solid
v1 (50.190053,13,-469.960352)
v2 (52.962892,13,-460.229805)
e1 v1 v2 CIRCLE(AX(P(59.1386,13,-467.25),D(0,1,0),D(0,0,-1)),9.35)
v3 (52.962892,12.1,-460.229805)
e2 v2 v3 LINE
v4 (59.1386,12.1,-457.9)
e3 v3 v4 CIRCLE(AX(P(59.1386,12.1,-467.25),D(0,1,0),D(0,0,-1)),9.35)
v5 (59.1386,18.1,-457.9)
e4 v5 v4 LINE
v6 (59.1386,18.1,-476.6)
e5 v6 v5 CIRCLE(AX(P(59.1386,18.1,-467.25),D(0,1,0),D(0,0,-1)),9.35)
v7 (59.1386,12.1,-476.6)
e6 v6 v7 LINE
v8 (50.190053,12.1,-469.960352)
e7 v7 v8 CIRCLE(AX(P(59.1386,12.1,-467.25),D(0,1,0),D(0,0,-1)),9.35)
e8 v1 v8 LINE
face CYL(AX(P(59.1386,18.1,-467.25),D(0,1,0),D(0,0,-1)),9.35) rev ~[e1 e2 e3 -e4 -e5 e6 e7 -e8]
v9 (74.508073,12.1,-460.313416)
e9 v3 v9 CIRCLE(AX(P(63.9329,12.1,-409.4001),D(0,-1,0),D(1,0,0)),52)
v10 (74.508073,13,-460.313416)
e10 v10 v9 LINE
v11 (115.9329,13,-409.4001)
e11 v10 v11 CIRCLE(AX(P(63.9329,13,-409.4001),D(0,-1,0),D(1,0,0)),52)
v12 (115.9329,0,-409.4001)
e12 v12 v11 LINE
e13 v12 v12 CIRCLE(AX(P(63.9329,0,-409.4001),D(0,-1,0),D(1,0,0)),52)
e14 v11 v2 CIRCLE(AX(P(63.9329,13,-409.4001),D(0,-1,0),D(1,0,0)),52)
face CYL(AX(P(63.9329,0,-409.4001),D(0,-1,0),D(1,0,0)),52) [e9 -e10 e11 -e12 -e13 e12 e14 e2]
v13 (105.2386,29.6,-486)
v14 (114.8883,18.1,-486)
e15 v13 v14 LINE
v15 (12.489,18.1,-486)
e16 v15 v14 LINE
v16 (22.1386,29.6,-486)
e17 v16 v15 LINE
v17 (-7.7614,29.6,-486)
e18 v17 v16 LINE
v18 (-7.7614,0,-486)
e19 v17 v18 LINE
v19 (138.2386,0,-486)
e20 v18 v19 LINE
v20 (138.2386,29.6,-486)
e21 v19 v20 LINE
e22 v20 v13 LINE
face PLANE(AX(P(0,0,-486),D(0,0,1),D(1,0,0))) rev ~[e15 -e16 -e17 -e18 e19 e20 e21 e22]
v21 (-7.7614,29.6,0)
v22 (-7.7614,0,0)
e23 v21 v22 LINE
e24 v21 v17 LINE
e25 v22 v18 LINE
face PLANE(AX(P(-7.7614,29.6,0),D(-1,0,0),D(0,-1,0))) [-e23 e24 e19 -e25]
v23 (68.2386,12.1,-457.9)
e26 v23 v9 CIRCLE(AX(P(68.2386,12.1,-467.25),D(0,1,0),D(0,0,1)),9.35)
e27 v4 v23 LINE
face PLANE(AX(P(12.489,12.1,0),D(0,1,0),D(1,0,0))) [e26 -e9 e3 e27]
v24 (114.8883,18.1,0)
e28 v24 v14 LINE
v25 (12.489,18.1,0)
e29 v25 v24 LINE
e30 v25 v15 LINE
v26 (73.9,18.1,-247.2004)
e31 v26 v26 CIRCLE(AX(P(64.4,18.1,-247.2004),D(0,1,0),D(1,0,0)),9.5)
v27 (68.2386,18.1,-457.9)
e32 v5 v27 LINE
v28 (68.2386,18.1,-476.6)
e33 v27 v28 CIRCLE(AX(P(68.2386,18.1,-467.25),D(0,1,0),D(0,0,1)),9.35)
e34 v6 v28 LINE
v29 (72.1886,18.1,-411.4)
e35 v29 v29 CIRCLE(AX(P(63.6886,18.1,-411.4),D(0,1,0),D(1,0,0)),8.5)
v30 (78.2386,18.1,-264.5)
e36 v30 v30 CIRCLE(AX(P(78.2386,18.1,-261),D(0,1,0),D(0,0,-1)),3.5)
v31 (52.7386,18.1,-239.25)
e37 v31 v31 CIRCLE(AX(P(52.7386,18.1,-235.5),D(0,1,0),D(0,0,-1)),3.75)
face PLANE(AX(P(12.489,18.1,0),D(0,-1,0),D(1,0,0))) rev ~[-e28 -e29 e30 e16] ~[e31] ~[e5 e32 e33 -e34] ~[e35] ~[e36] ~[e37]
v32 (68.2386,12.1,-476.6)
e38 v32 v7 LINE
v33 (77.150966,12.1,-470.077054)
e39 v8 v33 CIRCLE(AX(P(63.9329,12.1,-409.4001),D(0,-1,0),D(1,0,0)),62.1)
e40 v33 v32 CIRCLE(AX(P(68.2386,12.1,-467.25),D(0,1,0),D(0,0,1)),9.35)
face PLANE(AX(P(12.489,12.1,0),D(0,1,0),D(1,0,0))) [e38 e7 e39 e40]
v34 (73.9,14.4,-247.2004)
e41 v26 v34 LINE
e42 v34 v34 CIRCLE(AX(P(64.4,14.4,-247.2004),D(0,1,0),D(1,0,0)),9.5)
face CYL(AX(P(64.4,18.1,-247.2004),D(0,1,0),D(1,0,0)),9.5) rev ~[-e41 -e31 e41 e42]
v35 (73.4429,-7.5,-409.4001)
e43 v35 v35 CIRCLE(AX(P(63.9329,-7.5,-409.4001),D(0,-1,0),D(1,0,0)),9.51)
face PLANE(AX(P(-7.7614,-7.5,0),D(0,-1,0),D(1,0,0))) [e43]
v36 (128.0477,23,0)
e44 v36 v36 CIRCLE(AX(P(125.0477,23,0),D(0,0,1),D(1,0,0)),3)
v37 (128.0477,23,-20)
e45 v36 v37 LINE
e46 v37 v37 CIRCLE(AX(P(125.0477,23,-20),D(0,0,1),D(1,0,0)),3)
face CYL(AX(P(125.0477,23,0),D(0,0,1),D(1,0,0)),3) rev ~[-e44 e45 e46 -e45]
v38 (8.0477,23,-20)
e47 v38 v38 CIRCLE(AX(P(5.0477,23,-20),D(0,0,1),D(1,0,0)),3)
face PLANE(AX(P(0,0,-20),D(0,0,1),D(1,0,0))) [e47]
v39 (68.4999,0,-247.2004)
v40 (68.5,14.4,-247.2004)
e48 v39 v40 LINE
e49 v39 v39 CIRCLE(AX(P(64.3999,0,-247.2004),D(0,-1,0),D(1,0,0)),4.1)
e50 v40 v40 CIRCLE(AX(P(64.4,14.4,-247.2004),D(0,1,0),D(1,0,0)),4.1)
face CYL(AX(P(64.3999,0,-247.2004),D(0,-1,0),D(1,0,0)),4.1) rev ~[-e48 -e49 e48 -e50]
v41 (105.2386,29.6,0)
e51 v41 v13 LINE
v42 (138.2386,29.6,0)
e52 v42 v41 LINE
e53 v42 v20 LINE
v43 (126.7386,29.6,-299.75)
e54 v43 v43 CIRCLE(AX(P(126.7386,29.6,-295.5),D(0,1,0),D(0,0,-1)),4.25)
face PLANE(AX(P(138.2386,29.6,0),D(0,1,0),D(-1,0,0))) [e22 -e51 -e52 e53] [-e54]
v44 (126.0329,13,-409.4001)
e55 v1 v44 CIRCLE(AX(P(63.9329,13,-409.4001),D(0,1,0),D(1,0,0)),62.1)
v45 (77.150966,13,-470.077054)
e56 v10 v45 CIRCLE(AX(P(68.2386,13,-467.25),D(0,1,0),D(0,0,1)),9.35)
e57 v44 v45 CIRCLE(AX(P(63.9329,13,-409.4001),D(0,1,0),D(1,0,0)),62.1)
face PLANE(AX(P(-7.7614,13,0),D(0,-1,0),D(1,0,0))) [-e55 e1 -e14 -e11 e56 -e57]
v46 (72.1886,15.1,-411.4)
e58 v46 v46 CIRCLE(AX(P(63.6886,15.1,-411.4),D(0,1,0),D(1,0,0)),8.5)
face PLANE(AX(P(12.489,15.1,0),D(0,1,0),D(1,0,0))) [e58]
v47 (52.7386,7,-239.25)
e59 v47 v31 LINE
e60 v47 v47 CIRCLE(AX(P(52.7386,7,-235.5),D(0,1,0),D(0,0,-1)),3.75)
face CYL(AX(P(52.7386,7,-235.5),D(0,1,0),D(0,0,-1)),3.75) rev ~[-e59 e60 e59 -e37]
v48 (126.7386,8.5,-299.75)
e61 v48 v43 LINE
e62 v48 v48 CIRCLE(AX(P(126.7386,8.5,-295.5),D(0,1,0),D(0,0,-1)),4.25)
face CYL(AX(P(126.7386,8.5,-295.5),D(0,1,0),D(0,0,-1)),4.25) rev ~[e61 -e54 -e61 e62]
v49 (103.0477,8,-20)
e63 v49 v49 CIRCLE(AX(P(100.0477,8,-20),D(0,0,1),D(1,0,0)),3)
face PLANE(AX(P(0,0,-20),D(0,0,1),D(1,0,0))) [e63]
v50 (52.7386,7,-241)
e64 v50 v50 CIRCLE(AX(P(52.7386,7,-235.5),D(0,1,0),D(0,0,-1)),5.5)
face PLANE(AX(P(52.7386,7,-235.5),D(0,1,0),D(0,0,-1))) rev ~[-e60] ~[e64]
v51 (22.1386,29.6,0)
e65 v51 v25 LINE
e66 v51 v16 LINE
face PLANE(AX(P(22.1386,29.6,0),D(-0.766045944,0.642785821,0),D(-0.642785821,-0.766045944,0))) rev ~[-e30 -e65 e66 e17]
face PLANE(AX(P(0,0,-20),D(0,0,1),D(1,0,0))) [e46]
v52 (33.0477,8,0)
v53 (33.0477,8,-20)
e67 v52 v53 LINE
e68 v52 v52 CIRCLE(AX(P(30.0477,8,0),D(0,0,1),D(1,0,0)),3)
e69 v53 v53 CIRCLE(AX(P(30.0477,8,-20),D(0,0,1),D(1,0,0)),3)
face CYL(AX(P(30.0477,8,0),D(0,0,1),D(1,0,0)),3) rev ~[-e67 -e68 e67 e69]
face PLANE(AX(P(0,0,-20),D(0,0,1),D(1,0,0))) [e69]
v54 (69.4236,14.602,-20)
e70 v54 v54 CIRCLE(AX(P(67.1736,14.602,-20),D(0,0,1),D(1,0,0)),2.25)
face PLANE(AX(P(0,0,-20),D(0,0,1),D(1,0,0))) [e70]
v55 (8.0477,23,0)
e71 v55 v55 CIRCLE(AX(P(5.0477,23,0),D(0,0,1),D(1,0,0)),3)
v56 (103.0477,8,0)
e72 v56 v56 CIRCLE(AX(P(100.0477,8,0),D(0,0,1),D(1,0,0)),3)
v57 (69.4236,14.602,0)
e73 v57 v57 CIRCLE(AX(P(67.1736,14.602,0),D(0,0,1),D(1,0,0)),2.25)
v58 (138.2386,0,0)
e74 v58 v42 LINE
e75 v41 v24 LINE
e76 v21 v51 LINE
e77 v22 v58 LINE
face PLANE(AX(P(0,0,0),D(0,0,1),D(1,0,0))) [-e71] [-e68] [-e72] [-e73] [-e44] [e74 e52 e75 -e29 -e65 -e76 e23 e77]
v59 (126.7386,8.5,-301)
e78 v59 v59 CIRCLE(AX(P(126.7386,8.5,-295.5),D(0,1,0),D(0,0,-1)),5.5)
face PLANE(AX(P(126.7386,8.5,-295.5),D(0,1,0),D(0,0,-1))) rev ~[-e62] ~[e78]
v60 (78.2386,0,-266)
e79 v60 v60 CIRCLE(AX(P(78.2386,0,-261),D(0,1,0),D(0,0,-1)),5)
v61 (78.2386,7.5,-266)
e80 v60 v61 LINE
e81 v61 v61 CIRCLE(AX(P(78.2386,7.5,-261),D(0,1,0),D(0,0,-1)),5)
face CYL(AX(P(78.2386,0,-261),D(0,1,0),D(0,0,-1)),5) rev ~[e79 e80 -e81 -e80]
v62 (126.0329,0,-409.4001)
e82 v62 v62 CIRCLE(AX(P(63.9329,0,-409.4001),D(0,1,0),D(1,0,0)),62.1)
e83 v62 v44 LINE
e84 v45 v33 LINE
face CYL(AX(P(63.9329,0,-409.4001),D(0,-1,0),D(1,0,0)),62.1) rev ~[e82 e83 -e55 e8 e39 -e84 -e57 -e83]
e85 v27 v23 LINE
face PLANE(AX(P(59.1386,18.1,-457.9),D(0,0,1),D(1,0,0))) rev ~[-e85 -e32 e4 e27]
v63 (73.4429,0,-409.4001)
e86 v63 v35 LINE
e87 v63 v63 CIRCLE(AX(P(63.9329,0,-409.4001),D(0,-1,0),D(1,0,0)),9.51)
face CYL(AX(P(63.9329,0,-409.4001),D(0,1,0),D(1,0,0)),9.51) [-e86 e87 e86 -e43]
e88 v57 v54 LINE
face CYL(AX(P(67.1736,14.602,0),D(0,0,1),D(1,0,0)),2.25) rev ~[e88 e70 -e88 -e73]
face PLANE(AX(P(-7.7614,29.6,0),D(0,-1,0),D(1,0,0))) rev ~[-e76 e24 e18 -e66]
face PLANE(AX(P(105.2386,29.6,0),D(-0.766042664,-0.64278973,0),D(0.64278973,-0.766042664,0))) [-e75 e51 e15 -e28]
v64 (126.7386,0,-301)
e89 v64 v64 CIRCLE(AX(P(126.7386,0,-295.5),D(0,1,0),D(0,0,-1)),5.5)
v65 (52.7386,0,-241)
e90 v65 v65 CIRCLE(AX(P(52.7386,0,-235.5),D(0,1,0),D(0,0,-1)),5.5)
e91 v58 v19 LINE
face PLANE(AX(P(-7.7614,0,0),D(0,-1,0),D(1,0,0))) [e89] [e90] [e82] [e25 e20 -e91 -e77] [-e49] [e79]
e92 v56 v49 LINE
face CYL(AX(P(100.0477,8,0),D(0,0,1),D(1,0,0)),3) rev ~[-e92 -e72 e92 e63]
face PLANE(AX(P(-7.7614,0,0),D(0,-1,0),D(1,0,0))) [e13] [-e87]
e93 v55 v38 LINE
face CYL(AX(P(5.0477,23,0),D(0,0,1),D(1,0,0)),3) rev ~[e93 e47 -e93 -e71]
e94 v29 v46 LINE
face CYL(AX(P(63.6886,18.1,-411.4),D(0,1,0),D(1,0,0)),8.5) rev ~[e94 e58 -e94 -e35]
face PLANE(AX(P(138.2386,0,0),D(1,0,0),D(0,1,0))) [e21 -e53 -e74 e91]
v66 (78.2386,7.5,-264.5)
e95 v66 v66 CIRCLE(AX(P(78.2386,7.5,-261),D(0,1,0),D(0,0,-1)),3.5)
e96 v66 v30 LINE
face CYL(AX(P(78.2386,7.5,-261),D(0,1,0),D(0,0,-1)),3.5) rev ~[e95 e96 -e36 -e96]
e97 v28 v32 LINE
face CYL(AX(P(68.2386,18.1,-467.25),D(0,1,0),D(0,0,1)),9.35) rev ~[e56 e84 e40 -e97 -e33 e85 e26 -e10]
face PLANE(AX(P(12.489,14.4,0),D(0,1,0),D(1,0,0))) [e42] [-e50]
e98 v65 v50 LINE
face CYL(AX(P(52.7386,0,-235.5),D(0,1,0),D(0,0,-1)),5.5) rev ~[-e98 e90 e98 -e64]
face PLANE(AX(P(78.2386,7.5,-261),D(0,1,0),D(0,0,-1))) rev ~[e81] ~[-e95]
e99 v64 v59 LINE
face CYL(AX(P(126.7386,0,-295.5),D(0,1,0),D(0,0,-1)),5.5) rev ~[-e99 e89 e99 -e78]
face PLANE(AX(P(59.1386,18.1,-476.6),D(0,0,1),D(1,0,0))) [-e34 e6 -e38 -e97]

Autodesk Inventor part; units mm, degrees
ref_plane "YZ Plane" through (0, 0, 0) normal (1, 0, 0) x (0, 1, 0)
ref_plane "XZ Plane" through (0, 0, 0) normal (0, 1, 0) x (-1, 0, 0)
ref_plane "XY Plane" through (0, 0, 0) normal (0, 0, 1) x (1, 0, 0)
sketch "Sketch1" plane through (0, 0, 0) normal (0, 0, 1) x (1, 0, 0)
  line L0 (-7.7614, 0) -> (138.2386, 0)
  line L1 (138.2386, 0) -> (138.2386, 29.6)
  line L2 (-7.7614, 29.6) -> (-7.7614, 0)
  line L3 (-7.7614, 29.6) -> (22.1386, 29.6)
  line L4 (12.489, 18.1) -> (114.8883, 18.1)
  line L5 (22.1386, 29.6) -> (12.489, 18.1)
  line L6 (22.1386, 29.6) -> (41.4586, 29.6) construction
  line L7 (138.2386, 29.6) -> (105.2386, 29.6)
  line L8 (105.2386, 29.6) -> (114.8883, 18.1)
  point P0 (0, 0)
  dimension "d0" = 146
  dimension "d1" = 29.6
  dimension "d2" = 29.9
  dimension "d4" = 130
  dimension "d5" = 33
  dimension "d6" = 50
extrude "Extrusion1" add sketch "Sketch1" against normal blind 486
sketch "Sketch2" plane through (-7.7614, 29.6, 0) normal (0, 1, 0) x (1, 0, 0)
  line L0 (113, 0) -> (122.6496, 0) projected
  line L1 (124, 486) -> (113, 0)
  line L2 (113, 0) -> (113, 486) projected
  line L3 (113, 486) -> (124, 486)
  line L4 (122.6496, 0) -> (122.6496, 486) projected
  line L5 (113, 486) -> (113, 0)
  line L6 (146, 0) -> (146, 486) projected
  point P0 (7.7614, 0)
  dimension "d9" = 22
sketch "Sketch3" plane through (-7.7614, 0, 0) normal (0, -1, 0) x (1, 0, 0)
  line L0 (20.2504, -486) -> (122.6496, -486) projected
  line L1 (0, 0) -> (146, 0) projected
  circle A0 centre (71.6943, -409.4001) radius 62.1
  line L2 (71.45, -486) -> (71.4962, -471.5001)
  circle A1 centre (71.6943, -409.4001) radius 52
  circle A2 centre (71.6943, -409.4001) radius 9.51
  circle A3 centre (72.1613, -247.2004) radius 4.1
  point P0 (7.7614, 0)
  dimension "d10" = 124.2
  dimension "d11" = 14.5
  dimension "d12" = 62.1
  dimension "d13" = 104
  dimension "d14" = 19.02
  dimension "d15" = 8.2
extrude "Extrusion2" cut sketch "Sketch3" against normal blind 13 contours A0
extrude "Extrusion3" add sketch "Sketch3" along normal blind 7.5 contours A2
extrude "Extrusion4" cut sketch "Sketch3" against normal through all contours A3
sketch "Sketch4" plane through (12.489, 18.1, 0) normal (0, 1, 0) x (1, 0, 0)
  circle A0 centre (51.911, 247.2004) radius 4.1 projected
  circle A1 centre (51.911, 247.2004) radius 9.5
  line L0 (0, 486) -> (102.3993, 486) projected
  line L1 (51.1996, 486) -> (51.1996, 476.6)
  arc A2 (46.6496, 476.6) -> (46.6496, 457.9) centre (46.6496, 467.25) ccw
  arc A3 (55.7496, 457.9) -> (55.7496, 476.6) centre (55.7496, 467.25) ccw
  line L2 (46.6496, 476.6) -> (55.7496, 476.6)
  line L3 (46.6496, 457.9) -> (55.7496, 457.9)
  circle A4 centre (51.1996, 411.4) radius 8.5
  point P0 (-12.489, 0)
  point P1 (51.1996, 476.6)
  dimension "d23" = 19
  dimension "d26" = 9.4
  dimension "d29" = 0
  dimension "d30" = 18.7
  dimension "d31" = 18.7
  dimension "d38" = 17
  dimension "d39" = 46.5
extrude "Extrusion5" cut sketch "Sketch4" against normal blind 3.7 contours A1
extrude "Extrusion7" cut sketch "Sketch4" against normal blind 6 contours L2 A3 L3 A2
extrude "Extrusion8" cut sketch "Sketch4" against normal blind 3 contours A4
sketch "Sketch5" plane through (-7.7614, 0, 0) normal (0, -1, 0) x (1, 0, 0)
  point P0 (7.7614, 0)
sketch "Sketch6" plane through (-7.7614, 0, 0) normal (0, -1, 0) x (1, 0, 0)
  circle A0 centre (86, -261) radius 5
  line L0 (146, -486) -> (0, -486) projected
  line L1 (146, 0) -> (146, -486) projected
  circle A1 centre (60.5, -235.5) radius 5.5
  line L2 (0, 0) -> (0, -486) projected
  circle A2 centre (134.5, -295.5) radius 5.5
  point P0 (7.7614, 0)
  dimension "d42" = 10
  dimension "d43" = 225
  dimension "d44" = 60
  dimension "d45" = 11
  dimension "d46" = 60.5
  dimension "d47" = 250.5
  dimension "d48" = 11
  dimension "d49" = 190.5
  dimension "d50" = 11.5
hole "Hole1" at (126.7386, 0, -295.5) direction (0, 1, 0) diameter 8.5 end through all counterbore diameter 11 counterbore depth 8.5
hole "Hole2" at (78.2386, 0, -261) direction (0, 1, 0) diameter 7 end through all counterbore diameter 10 counterbore depth 7.5
hole "Hole3" at (52.7386, 0, -235.5) direction (0, 1, 0) diameter 7.5 end through all counterbore diameter 11 counterbore depth 7
thread "Thread1" size "M9x1.25" class "6H" standard "ANSI Metric M Profile" full length
sketch "Sketch12" plane through (0, 0, 0) normal (0, 0, 1) x (1, 0, 0)
  circle A0 centre (125.0477, 23) radius 3 projected
  circle A1 centre (100.0477, 8) radius 3 projected
  circle A2 centre (30.0477, 8) radius 3 projected
  circle A3 centre (5.0477, 23) radius 3 projected
  circle A4 centre (67.1736, 14.602) radius 2.25 projected
  point P0 (0, 0)
extrude "Extrusion9" cut sketch "Sketch12" against normal blind 20
properties part number "slide ontop of saddle" material "Steel, Cast"
